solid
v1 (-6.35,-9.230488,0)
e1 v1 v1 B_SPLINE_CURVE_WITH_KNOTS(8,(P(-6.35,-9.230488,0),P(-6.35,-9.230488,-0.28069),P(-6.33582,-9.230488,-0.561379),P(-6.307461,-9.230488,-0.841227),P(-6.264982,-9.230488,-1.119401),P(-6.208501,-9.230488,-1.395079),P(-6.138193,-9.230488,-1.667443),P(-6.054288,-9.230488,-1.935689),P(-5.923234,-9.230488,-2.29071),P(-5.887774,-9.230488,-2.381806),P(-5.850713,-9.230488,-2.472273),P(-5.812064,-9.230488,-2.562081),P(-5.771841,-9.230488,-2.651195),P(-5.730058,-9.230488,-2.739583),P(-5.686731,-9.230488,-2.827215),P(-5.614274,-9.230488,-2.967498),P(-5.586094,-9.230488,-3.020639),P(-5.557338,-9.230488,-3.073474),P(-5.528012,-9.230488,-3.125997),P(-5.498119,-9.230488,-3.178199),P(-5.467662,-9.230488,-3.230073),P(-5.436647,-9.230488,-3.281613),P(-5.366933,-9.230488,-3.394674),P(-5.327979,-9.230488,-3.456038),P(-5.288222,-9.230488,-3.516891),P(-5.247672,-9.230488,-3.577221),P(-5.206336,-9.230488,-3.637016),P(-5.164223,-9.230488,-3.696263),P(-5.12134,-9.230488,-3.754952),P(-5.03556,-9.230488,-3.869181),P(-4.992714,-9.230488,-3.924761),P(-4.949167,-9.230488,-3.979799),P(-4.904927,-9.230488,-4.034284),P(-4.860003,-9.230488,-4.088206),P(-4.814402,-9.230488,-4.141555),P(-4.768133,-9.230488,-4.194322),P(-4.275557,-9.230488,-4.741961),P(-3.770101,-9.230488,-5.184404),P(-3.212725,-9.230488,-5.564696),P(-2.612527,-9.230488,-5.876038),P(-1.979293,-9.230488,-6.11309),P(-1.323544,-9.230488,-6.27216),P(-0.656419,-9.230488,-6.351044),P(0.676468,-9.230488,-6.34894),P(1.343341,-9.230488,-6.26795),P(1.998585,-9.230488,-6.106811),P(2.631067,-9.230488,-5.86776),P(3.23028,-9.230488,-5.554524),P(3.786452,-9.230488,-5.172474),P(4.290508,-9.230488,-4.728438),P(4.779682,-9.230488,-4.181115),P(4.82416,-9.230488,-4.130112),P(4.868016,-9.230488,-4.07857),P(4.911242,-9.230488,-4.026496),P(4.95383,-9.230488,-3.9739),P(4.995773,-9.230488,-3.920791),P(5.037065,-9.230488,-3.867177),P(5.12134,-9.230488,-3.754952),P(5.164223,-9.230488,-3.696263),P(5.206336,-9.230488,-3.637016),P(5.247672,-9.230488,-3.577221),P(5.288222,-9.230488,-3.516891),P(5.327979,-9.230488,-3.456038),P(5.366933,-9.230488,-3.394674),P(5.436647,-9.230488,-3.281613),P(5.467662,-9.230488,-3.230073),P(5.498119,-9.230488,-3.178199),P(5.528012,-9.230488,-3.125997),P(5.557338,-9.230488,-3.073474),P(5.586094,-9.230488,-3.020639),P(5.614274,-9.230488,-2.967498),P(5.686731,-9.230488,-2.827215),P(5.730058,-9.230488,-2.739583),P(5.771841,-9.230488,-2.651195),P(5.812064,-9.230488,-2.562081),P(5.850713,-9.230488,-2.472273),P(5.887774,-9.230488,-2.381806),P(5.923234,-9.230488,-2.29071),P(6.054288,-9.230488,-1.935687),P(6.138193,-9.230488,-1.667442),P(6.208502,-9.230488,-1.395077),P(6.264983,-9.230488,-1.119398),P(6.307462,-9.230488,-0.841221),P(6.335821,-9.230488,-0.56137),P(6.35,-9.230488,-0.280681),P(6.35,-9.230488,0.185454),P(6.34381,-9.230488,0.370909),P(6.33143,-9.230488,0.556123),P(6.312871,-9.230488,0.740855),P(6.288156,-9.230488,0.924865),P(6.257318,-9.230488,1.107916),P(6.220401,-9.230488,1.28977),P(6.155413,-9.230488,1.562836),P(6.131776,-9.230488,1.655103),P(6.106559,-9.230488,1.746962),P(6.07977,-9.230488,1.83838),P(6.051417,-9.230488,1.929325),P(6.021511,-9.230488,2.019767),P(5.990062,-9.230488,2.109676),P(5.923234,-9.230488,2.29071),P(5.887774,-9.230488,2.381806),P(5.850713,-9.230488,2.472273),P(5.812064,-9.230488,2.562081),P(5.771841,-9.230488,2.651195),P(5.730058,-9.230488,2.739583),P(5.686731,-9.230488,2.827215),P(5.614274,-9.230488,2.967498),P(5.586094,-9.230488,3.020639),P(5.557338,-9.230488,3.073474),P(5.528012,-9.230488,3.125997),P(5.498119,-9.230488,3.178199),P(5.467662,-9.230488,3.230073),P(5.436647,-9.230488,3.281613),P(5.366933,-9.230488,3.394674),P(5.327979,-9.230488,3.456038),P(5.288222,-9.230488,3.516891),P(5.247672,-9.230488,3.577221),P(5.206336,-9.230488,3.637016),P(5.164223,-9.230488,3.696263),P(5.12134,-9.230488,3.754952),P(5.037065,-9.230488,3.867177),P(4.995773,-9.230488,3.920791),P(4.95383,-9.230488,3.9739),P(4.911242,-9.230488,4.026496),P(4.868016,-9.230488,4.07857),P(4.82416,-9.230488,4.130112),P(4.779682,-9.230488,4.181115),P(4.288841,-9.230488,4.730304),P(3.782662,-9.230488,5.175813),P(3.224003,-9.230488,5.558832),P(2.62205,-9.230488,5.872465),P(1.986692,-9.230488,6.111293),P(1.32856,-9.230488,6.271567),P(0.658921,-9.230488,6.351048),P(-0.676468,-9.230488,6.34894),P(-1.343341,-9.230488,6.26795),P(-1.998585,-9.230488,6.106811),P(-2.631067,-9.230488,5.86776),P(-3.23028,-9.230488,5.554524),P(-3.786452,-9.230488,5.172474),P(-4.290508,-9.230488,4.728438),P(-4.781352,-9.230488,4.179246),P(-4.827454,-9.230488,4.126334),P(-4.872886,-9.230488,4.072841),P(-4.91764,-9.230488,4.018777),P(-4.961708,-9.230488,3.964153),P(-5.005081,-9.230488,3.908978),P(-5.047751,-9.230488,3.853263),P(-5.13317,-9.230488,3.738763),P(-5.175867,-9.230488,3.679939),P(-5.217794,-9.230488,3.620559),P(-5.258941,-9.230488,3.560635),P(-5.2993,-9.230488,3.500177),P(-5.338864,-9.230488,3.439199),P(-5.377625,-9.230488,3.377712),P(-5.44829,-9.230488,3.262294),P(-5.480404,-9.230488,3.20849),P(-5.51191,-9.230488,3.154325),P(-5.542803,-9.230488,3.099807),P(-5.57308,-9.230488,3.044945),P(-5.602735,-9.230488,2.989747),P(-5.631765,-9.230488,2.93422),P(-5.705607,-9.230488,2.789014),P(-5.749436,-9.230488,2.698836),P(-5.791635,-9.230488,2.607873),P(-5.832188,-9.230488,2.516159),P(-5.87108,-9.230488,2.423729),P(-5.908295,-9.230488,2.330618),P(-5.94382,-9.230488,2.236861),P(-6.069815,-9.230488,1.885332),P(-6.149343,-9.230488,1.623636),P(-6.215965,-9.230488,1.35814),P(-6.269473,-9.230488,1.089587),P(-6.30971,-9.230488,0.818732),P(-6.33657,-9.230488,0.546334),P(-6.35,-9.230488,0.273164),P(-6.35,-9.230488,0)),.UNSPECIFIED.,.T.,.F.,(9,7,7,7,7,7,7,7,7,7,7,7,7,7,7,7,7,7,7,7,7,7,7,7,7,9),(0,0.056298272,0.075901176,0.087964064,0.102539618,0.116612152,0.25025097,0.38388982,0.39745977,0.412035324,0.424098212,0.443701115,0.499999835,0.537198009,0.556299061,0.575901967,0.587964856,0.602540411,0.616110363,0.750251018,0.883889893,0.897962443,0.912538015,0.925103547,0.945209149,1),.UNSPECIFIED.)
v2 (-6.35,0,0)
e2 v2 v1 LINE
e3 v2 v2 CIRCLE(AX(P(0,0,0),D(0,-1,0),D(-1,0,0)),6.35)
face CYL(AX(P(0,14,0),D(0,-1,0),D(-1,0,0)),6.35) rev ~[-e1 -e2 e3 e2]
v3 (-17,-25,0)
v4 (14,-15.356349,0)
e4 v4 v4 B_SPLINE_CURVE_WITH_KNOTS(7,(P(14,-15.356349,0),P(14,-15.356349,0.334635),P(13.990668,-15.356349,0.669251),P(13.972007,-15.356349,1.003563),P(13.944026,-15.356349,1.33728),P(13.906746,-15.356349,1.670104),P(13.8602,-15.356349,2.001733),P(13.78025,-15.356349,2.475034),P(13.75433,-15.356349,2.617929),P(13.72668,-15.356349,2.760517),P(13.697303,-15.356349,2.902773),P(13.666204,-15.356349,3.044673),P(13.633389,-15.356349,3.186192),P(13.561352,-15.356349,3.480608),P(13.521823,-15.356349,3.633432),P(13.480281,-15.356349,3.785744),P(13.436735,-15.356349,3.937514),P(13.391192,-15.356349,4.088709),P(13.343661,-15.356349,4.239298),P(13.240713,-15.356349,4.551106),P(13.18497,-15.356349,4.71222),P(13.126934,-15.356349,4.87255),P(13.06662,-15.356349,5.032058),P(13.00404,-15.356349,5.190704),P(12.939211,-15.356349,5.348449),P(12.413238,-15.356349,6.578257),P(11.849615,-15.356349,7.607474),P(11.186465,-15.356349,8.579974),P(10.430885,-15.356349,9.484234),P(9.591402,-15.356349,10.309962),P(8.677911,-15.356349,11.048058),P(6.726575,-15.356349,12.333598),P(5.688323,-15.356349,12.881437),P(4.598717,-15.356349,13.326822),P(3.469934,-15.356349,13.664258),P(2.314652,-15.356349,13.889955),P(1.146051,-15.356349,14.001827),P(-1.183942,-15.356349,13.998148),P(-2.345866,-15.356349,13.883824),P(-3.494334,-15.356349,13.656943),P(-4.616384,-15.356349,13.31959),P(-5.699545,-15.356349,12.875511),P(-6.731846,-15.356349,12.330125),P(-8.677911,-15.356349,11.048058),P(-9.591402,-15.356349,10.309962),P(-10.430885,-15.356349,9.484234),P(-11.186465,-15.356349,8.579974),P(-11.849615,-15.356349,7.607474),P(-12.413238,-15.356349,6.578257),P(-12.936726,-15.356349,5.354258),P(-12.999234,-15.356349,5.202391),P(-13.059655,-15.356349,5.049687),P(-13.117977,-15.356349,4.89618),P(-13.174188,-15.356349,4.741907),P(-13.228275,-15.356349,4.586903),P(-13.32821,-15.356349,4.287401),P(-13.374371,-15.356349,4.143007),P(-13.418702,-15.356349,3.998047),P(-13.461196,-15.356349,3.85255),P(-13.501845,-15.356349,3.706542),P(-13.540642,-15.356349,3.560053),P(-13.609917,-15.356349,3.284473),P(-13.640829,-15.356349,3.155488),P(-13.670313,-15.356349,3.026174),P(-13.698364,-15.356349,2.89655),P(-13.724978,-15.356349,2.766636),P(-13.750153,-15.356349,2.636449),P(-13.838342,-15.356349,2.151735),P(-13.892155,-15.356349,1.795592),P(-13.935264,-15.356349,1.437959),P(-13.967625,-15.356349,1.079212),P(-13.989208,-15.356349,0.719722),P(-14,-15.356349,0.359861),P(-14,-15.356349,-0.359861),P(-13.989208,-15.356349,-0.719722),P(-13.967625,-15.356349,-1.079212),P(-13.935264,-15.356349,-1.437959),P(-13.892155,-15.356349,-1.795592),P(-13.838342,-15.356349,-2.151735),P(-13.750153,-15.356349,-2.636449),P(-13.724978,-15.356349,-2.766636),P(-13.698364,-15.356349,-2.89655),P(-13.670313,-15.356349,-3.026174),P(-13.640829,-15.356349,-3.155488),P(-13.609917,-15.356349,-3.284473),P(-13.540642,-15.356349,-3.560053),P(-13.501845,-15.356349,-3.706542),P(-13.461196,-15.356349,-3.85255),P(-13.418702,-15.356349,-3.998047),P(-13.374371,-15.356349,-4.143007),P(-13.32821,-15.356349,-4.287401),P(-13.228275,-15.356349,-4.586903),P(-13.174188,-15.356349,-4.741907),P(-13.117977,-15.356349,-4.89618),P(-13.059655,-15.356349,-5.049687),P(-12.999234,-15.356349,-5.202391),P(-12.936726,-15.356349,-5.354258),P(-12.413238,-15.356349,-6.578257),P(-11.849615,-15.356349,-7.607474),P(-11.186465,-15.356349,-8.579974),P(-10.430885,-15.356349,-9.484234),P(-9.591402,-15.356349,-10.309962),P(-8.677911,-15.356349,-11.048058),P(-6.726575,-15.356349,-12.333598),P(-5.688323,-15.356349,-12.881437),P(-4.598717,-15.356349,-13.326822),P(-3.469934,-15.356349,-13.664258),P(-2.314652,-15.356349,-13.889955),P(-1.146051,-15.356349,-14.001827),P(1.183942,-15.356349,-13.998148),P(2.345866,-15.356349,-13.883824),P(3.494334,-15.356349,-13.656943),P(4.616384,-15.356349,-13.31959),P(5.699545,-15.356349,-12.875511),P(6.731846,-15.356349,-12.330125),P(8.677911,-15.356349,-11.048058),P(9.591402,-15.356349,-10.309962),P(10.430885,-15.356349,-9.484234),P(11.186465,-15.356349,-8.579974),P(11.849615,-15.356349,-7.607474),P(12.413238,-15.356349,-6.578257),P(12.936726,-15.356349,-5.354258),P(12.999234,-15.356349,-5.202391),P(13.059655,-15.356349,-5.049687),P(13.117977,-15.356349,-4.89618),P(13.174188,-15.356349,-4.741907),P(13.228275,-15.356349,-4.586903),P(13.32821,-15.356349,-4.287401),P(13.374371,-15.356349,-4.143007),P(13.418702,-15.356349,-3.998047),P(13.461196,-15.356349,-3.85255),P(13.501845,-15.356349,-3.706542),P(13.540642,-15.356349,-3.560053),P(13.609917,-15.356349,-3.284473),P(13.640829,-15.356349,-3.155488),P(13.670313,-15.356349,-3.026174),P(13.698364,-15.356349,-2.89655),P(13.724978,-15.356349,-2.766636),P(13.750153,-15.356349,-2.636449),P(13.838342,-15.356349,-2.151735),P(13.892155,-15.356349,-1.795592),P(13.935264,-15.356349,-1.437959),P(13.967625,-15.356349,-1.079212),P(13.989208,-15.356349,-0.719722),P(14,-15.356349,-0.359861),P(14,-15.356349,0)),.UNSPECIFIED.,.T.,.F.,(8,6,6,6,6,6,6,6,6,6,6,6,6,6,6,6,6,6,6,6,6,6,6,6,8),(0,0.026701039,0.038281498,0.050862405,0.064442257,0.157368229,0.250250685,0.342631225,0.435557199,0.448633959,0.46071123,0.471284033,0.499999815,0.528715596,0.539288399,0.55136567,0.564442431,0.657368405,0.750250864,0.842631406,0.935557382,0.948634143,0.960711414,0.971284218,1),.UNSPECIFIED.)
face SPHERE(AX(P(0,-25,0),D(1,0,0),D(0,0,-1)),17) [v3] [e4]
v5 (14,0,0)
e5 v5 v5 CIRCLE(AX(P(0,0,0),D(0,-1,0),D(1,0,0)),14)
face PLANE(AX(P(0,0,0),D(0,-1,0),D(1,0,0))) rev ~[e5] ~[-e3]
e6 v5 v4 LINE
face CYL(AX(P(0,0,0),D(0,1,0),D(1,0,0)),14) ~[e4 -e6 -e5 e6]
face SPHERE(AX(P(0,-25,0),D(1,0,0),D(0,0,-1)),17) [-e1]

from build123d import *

# Parameters (mm, degrees)
F0_R     = 14
F0_R_2   = 11.6
F1_DEPTH = 25
F2_D     = 12.7
F2_DEPTH = 14
F2_TIP   = 3.8154649308


# Not quite as in the source:
# - a length typed as a fraction of an inch, garbled in the dataset ("3 / 203.2 mm" for 3/8 in), is restored


with BuildPart() as f1:
    # F0 (on Front) → F1 (new body)
    with BuildSketch(Plane.XZ):
        Circle(F0_R)
        Circle(F0_R_2, mode=Mode.SUBTRACT)
        Circle(F0_R_2)
    extrude(amount=F1_DEPTH)

    # F2
    with Locations(Plane(origin=(0, 0, 0), x_dir=(1, 0, 0), z_dir=(0, 1, 0))):
        with Locations((0, 0)):
            Hole(F2_D / 2, depth=F2_DEPTH)
            with Locations((0, 0, -(F2_DEPTH + F2_TIP / 2))):  # 118° drill point
                Cone(0, F2_D / 2, F2_TIP, mode=Mode.SUBTRACT)

    # F3 (on face) → F4 (revolve)
    with BuildSketch(Plane.XZ.offset(25)):
        with BuildLine():
            Line((17, 0), (14, 0))
            ThreePointArc((14, 0), (0, -14), (-14, 0))
            Line((-14, 0), (-17, 0))
            ThreePointArc((-17, 0), (0, -17), (17, 0))
        make_face()
        with BuildLine():
            ThreePointArc((-14, 0), (0, -14), (14, 0))
            Line((14, 0), (-14, 0))
        make_face()
    revolve(axis=Axis((0, -25, 0), (1, 0, 0)))


solid = f1.part
